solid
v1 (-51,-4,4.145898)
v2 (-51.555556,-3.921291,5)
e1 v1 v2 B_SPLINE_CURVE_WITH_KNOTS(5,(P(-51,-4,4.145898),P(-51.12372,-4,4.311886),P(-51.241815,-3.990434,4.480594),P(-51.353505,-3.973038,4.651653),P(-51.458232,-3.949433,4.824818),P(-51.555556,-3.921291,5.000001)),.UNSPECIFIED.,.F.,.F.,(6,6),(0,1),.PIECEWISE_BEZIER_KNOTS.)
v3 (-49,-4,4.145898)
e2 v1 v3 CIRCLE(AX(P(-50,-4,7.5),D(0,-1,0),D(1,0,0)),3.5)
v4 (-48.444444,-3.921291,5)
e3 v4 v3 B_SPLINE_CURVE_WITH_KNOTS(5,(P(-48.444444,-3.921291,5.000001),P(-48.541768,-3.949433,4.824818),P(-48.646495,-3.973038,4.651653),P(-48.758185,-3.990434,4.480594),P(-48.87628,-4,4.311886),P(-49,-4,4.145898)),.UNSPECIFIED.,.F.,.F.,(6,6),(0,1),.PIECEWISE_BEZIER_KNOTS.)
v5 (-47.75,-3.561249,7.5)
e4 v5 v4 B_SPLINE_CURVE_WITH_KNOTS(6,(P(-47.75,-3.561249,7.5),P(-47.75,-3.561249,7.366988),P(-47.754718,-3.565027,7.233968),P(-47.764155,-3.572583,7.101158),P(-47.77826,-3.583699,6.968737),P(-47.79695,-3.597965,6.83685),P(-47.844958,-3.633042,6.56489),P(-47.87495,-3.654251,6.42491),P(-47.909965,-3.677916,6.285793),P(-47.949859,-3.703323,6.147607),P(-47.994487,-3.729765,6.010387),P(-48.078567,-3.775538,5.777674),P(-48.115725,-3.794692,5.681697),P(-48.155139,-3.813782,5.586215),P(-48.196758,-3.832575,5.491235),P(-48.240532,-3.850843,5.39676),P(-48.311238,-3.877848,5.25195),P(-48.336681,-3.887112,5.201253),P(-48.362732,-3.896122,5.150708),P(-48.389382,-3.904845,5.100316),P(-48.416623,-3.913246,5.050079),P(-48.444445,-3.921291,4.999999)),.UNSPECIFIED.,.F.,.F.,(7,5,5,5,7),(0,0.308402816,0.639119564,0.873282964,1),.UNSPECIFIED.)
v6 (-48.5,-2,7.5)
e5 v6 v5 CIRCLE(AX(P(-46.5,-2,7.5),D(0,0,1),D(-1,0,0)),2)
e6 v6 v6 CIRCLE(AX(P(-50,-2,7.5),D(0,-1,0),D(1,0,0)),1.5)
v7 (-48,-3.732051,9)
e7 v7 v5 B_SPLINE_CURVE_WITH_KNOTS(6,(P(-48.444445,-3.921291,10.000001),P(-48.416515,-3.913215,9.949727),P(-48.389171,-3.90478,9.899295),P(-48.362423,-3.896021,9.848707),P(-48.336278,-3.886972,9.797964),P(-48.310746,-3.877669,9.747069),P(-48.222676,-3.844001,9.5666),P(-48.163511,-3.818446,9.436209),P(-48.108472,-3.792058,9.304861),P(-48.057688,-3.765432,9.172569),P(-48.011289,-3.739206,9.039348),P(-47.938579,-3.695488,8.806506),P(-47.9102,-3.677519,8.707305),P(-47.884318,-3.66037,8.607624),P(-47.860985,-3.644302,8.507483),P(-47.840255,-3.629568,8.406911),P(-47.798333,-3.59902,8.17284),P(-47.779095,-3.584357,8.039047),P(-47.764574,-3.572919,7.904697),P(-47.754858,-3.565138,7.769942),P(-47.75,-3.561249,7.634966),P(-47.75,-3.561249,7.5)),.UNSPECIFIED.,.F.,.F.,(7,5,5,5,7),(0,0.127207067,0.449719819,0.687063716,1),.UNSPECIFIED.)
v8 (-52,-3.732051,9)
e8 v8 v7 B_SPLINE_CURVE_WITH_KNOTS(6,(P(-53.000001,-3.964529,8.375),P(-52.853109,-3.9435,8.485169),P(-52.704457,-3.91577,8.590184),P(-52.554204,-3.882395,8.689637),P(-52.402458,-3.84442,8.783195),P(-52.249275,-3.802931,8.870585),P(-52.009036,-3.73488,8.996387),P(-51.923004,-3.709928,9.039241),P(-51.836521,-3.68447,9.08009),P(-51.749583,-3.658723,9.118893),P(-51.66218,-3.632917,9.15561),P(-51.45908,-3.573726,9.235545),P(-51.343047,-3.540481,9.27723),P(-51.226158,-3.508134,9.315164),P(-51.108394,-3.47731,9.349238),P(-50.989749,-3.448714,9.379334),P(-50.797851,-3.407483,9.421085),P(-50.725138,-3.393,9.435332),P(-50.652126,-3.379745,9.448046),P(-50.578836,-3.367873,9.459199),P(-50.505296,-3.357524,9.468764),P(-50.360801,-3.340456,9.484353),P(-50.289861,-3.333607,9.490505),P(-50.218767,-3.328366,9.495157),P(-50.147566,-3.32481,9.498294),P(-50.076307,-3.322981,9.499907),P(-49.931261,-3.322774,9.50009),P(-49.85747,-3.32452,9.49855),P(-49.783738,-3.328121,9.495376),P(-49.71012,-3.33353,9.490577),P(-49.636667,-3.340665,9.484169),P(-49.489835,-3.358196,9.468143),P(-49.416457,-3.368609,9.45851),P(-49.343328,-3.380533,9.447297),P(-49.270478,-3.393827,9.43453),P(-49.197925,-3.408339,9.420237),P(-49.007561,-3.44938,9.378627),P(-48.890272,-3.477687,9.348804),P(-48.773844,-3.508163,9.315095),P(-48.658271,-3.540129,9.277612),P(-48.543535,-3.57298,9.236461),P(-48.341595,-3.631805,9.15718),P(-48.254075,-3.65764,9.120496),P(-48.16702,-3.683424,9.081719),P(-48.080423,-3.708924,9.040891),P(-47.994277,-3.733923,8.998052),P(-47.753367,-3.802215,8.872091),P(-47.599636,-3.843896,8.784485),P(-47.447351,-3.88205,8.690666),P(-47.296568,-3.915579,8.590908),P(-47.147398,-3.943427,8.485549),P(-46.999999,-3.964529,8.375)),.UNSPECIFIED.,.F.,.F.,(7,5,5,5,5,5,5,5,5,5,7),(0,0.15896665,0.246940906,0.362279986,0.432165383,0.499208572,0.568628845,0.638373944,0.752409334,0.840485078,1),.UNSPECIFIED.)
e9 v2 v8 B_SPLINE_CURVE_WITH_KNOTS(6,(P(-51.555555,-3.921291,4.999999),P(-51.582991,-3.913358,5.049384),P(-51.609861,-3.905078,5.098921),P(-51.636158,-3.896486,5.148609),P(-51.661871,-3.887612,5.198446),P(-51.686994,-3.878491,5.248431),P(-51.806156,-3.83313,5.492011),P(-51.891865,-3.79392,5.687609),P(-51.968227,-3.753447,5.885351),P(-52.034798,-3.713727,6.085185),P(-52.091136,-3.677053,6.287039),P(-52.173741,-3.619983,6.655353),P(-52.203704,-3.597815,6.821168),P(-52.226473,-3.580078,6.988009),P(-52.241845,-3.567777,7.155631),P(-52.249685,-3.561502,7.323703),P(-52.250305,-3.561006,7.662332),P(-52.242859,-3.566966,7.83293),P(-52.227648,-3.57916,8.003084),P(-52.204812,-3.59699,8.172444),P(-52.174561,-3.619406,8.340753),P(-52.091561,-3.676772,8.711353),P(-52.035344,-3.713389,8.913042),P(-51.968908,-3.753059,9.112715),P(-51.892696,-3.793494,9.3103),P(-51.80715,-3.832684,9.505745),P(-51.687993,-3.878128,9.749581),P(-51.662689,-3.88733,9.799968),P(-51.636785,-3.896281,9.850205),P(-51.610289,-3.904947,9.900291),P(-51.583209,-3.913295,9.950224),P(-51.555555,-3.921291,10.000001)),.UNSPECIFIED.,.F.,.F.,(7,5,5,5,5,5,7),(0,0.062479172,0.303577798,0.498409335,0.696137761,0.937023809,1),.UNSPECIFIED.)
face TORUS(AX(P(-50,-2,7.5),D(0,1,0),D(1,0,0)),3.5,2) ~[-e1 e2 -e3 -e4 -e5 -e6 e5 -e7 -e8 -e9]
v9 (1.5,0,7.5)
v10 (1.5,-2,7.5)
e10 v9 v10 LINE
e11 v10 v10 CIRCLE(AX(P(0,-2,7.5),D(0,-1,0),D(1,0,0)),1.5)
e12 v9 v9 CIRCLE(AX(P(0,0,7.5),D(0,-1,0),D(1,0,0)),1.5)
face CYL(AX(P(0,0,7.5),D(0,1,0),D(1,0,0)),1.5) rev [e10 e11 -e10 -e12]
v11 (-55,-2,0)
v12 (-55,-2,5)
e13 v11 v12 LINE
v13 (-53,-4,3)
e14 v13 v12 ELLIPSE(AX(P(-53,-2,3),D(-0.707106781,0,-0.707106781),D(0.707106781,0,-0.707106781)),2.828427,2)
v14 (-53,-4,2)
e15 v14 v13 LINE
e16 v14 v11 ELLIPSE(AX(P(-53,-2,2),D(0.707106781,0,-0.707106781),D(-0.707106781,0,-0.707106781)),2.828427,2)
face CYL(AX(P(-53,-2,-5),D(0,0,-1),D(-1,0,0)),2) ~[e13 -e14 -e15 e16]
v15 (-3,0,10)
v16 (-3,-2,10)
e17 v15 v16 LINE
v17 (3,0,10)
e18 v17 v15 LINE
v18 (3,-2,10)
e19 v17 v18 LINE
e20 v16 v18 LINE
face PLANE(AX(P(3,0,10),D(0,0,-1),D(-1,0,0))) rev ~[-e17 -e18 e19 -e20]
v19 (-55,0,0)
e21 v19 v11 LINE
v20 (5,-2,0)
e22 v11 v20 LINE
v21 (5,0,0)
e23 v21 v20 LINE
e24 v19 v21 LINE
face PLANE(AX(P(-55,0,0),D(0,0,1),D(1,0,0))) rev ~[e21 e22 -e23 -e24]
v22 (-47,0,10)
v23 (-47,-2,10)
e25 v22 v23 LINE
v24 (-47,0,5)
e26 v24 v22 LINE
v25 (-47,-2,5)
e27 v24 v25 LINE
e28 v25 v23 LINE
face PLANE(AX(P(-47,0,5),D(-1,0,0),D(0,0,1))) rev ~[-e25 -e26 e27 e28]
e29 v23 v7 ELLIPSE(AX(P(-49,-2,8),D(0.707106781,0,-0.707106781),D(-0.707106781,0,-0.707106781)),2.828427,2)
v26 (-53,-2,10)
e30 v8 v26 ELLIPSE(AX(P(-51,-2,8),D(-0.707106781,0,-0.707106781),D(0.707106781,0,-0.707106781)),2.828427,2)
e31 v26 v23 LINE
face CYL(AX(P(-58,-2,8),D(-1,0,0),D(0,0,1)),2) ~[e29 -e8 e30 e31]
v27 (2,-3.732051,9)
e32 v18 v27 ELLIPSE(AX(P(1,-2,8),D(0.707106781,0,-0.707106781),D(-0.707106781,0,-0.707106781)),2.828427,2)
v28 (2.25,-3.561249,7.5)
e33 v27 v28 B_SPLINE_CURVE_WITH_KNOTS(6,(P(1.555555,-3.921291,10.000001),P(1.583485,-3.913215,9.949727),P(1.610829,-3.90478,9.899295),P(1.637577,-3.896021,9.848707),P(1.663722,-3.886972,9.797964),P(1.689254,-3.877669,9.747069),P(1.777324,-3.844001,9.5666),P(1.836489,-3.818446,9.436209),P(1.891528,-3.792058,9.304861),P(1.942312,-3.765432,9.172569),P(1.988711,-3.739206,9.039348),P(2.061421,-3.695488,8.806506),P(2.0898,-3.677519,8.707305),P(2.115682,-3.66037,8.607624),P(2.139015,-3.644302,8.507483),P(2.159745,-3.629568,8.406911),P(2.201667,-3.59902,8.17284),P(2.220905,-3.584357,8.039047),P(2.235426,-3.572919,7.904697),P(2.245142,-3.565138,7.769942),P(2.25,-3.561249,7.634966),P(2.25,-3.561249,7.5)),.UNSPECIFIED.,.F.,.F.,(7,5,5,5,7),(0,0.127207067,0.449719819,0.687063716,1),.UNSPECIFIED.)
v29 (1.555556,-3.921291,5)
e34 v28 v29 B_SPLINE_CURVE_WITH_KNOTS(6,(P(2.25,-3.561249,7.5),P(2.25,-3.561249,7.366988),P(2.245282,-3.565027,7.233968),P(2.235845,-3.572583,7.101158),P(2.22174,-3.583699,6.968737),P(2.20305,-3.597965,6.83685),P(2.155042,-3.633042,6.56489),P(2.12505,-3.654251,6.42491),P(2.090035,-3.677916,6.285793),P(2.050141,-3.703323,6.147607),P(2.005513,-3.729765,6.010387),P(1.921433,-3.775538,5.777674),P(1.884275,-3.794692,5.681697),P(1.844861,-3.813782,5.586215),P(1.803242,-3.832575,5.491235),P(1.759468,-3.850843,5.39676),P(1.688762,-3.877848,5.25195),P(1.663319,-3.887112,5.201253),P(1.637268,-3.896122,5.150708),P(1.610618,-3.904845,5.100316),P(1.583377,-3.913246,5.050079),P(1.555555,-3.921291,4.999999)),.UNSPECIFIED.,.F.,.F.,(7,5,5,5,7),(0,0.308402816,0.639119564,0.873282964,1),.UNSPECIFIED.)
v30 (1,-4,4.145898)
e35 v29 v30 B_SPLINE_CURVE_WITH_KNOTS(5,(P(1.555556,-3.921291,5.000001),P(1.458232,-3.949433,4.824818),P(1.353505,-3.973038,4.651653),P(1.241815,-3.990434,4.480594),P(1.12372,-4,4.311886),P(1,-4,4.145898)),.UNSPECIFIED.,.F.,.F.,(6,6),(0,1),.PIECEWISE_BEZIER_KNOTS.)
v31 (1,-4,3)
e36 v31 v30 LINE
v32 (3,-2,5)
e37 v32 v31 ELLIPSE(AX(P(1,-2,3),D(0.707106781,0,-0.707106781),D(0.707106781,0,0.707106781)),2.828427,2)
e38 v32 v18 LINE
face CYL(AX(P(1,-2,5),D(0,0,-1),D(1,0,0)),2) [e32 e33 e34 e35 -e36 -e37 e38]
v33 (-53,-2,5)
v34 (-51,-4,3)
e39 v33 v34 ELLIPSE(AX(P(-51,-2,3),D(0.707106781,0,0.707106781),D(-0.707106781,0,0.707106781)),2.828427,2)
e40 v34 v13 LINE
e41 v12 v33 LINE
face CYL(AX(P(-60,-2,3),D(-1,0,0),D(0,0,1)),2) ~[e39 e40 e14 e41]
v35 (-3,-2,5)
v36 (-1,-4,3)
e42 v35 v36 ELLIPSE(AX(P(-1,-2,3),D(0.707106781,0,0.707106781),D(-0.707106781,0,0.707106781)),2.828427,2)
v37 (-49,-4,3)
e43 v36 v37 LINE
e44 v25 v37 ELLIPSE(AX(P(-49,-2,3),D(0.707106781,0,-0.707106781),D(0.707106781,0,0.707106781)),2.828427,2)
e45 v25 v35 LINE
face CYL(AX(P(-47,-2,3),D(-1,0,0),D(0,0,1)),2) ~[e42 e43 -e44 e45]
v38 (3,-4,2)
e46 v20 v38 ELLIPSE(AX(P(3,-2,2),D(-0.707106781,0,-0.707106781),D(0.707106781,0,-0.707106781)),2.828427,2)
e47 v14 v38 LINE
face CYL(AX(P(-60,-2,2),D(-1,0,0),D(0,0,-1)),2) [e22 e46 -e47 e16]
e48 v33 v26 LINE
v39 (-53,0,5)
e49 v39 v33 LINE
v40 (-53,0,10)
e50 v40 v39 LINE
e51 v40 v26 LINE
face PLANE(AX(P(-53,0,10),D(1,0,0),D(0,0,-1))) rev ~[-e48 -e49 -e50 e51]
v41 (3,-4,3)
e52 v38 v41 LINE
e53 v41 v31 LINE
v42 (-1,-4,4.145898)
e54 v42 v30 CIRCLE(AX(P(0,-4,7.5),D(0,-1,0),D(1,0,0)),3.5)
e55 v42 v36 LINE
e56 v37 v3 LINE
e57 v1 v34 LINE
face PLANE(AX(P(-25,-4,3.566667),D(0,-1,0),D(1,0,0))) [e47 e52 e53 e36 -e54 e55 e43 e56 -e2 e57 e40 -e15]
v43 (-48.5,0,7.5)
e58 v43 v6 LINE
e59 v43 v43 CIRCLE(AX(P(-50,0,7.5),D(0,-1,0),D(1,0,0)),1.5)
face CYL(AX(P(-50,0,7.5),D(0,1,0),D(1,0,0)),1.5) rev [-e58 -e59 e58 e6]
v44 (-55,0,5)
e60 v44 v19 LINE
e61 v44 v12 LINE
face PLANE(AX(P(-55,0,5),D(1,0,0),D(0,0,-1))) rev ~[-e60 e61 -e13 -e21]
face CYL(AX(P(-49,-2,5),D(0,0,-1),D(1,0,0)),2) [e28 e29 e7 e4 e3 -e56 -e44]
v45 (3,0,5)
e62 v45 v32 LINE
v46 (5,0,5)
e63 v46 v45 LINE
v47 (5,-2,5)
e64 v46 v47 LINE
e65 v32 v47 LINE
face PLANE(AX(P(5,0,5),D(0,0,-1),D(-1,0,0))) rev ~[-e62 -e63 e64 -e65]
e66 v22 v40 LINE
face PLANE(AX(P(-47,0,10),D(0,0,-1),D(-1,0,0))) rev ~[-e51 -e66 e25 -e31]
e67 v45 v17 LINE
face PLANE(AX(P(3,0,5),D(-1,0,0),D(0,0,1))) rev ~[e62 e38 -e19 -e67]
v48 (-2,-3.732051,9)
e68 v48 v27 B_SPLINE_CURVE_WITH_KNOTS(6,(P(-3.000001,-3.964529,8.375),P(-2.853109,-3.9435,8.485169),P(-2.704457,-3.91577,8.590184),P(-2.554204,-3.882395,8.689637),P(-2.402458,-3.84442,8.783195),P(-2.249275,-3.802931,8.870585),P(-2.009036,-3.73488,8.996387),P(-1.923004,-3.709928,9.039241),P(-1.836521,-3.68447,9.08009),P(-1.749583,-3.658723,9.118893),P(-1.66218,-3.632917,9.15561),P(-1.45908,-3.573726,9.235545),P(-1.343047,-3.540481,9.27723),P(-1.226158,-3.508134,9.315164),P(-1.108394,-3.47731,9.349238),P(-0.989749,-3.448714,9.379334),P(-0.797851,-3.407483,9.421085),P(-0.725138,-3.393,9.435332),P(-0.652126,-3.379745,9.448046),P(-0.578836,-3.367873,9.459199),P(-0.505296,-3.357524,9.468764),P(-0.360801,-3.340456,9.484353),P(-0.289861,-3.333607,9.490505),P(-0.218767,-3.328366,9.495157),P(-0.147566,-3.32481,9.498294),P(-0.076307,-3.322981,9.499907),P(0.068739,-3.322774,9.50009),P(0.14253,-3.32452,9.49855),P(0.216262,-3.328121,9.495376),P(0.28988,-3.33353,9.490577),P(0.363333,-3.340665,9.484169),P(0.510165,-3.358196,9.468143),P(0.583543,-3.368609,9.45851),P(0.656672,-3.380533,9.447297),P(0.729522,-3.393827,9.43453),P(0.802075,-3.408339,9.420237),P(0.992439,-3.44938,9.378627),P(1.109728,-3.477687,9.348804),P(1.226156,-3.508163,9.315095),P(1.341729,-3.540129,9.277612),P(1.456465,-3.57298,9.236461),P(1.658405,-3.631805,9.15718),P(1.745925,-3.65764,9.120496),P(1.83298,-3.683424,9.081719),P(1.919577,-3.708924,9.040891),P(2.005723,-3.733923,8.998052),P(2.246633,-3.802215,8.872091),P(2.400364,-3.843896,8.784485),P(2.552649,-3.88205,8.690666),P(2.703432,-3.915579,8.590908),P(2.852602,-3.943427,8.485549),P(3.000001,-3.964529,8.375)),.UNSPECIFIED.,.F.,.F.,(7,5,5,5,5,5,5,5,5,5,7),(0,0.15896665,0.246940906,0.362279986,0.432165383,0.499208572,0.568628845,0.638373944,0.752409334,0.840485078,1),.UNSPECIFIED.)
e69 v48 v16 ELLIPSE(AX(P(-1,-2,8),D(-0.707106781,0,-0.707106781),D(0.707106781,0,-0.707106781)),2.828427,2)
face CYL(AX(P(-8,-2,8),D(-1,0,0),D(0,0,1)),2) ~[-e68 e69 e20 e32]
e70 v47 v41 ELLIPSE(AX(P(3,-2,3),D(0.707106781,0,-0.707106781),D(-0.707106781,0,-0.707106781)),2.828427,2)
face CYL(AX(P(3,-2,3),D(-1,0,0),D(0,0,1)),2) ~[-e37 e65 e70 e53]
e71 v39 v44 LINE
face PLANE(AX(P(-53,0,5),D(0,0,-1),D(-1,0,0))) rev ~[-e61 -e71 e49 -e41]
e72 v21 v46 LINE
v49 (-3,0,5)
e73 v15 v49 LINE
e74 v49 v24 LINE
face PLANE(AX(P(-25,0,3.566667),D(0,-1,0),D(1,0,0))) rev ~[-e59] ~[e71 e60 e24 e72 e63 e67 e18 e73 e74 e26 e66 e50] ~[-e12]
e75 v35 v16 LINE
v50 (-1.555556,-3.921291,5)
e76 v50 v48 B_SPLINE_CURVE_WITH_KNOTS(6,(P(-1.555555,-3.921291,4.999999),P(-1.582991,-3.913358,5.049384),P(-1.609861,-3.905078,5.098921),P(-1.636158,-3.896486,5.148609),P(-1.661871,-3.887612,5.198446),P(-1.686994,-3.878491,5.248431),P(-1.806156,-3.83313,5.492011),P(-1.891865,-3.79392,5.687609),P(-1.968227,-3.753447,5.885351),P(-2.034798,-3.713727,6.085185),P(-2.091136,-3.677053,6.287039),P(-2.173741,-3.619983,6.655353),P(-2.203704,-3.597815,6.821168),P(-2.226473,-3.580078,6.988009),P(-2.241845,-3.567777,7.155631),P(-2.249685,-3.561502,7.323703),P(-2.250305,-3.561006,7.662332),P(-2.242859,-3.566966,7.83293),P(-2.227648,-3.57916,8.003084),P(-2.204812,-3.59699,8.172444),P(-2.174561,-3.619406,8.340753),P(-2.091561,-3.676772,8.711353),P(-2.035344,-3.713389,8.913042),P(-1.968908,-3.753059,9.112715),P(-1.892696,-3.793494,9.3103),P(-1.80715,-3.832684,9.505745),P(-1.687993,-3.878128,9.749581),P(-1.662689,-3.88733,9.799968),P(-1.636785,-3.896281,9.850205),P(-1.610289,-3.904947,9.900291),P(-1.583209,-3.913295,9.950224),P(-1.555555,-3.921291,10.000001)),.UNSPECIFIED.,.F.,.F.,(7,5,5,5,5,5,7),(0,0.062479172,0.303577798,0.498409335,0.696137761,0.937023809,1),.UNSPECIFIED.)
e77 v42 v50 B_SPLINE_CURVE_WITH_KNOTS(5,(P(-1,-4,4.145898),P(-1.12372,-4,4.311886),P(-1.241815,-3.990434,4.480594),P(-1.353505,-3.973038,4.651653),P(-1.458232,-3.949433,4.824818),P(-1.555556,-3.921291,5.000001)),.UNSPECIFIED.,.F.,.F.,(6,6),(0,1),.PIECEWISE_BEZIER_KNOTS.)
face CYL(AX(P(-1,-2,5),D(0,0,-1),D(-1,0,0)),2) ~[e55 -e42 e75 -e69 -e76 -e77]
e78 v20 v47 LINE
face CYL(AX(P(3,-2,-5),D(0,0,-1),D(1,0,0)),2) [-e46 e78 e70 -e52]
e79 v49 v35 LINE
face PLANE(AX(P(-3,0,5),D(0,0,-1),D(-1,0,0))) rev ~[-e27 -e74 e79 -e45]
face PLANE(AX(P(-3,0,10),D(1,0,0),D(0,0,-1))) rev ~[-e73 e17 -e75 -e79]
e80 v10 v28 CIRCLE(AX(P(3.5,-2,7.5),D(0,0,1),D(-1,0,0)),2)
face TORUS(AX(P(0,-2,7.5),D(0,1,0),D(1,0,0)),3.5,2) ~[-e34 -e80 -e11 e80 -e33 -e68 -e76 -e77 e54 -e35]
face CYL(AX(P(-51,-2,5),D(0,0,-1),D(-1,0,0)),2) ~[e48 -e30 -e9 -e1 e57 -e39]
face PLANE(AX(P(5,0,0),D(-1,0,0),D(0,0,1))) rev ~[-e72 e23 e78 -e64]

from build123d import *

# Parameters (mm, degrees)
F0_R         = 1.5
F1_DEPTH     = 4
F2_T1_DEPTH  = 15
F2_T3_DEPTH  = 70
F2_T5_DEPTH  = 7
F2_T7_DEPTH  = 10
F2_T9_DEPTH  = 16
F2_T11_DEPTH = 44
F2_T13_DEPTH = 16
F2_T15_DEPTH = 7
F2_T25_DEPTH = 12
F2_T29_DEPTH = 15
F2_T36_DEPTH = 15
F2_T40_DEPTH = 49
F2_T47_DEPTH = 49
F2_T51_DEPTH = 15
F2_T58_DEPTH = 15
F2_T62_DEPTH = 12


# Not quite as in the source:
# - a fillet or chamfer that OpenCascade refuses, or shapes differently, is made with other operations: its cross-section is extruded or revolved along the edge and cut away or added


with BuildPart() as f1:
    # F0 (on Front) → F1 (new body)
    with BuildSketch(Plane.XZ):
        Polygon((-55, 5), (-55, 0), (5, 0), (5, 5), (3, 5), (3, 10), (-3, 10), (-3, 5), (-47, 5), (-47, 10), (-53, 10), (-53, 5), align=None)
        with Locations((-50, 7.5)):
            Circle(F0_R, mode=Mode.SUBTRACT)
        with Locations((0, 7.5)):
            Circle(F0_R, mode=Mode.SUBTRACT)
    extrude(amount=F1_DEPTH)

    # F2: fillet of radius 2 on 14 edges, made by hand

    # F2_s2 → F2_t1 (cut)
    with BuildSketch(Plane.XY.offset(-5)):
        with BuildLine():
            ThreePointArc((-55, -2), (-54.4142135624, -3.4142135624), (-53, -4))
            Line((-53, -4), (-55, -4))
            Line((-55, -4), (-55, -2))
        make_face()
        with BuildLine():
            ThreePointArc((5, -2), (4.4142135624, -3.4142135624), (3, -4))
            Line((3, -4), (5, -4))
            Line((5, -4), (5, -2))
        make_face()
    extrude(amount=F2_T1_DEPTH, mode=Mode.SUBTRACT)

    # F2_s4 → F2_t3 (cut)
    with BuildSketch(Plane.YZ.offset(-60)):
        with BuildLine():
            ThreePointArc((-2, 0), (-3.4142135624, 0.5857864376), (-4, 2))
            Line((-4, 2), (-4, 0))
            Line((-4, 0), (-2, 0))
        make_face()
    extrude(amount=F2_T3_DEPTH, mode=Mode.SUBTRACT)

    # F2_s6 → F2_t5 (cut)
    with BuildSketch(Plane.YZ.offset(3)):
        with BuildLine():
            ThreePointArc((-2, 5), (-3.4142135624, 4.4142135624), (-4, 3))
            Line((-4, 3), (-4, 5))
            Line((-4, 5), (-2, 5))
        make_face()
    extrude(amount=F2_T5_DEPTH, mode=Mode.SUBTRACT)

    # F2_s8 → F2_t7 (cut)
    with BuildSketch(Plane.XY.offset(5)):
        with BuildLine():
            ThreePointArc((3, -2), (2.4142135624, -3.4142135624), (1, -4))
            Line((1, -4), (3, -4))
            Line((3, -4), (3, -2))
        make_face()
        with BuildLine():
            ThreePointArc((-3, -2), (-2.4142135624, -3.4142135624), (-1, -4))
            Line((-1, -4), (-3, -4))
            Line((-3, -4), (-3, -2))
        make_face()
        with BuildLine():
            ThreePointArc((-47, -2), (-47.5857864376, -3.4142135624), (-49, -4))
            Line((-49, -4), (-47, -4))
            Line((-47, -4), (-47, -2))
        make_face()
        with BuildLine():
            ThreePointArc((-53, -2), (-52.4142135624, -3.4142135624), (-51, -4))
            Line((-51, -4), (-53, -4))
            Line((-53, -4), (-53, -2))
        make_face()
    extrude(amount=F2_T7_DEPTH, mode=Mode.SUBTRACT)

    # F2_s10 → F2_t9 (cut)
    with BuildSketch(Plane.YZ.offset(-8)):
        with BuildLine():
            ThreePointArc((-2, 10), (-3.4142135624, 9.4142135624), (-4, 8))
            Line((-4, 8), (-4, 10))
            Line((-4, 10), (-2, 10))
        make_face()
    extrude(amount=F2_T9_DEPTH, mode=Mode.SUBTRACT)

    # F2_s12 → F2_t11 (cut)
    with BuildSketch(Plane.YZ.offset(-47)):
        with BuildLine():
            ThreePointArc((-2, 5), (-3.4142135624, 4.4142135624), (-4, 3))
            Line((-4, 3), (-4, 5))
            Line((-4, 5), (-2, 5))
        make_face()
    extrude(amount=F2_T11_DEPTH, mode=Mode.SUBTRACT)

    # F2_s14 → F2_t13 (cut)
    with BuildSketch(Plane.YZ.offset(-58)):
        with BuildLine():
            ThreePointArc((-2, 10), (-3.4142135624, 9.4142135624), (-4, 8))
            Line((-4, 8), (-4, 10))
            Line((-4, 10), (-2, 10))
        make_face()
    extrude(amount=F2_T13_DEPTH, mode=Mode.SUBTRACT)

    # F2_s16 → F2_t15 (cut)
    with BuildSketch(Plane.YZ.offset(-60)):
        with BuildLine():
            ThreePointArc((-2, 5), (-3.4142135624, 4.4142135624), (-4, 3))
            Line((-4, 3), (-4, 5))
            Line((-4, 5), (-2, 5))
        make_face()
    extrude(amount=F2_T15_DEPTH, mode=Mode.SUBTRACT)

    # F2_s17 → F2_t18 (revolve, cut)
    with BuildSketch(Plane.XY.offset(7.5)):
        with BuildLine():
            ThreePointArc((-48.5, -2), (-47.9142135624, -3.4142135624), (-46.5, -4))
            Line((-46.5, -4), (-48.5, -4))
            Line((-48.5, -4), (-48.5, -2))
        make_face()
    revolve(axis=Axis((-50, -4, 7.5), (0, -1, 0)), mode=Mode.SUBTRACT)

    # F2_s19 → F2_t20 (revolve, cut)
    with BuildSketch(Plane.XY.offset(7.5)):
        with BuildLine():
            ThreePointArc((1.5, -2), (2.0857864376, -3.4142135624), (3.5, -4))
            Line((3.5, -4), (1.5, -4))
            Line((1.5, -4), (1.5, -2))
        make_face()
    revolve(axis=Axis((0, -4, 7.5), (0, -1, 0)), mode=Mode.SUBTRACT)


with BuildPart() as f2_tool23:
    # F2_s24 → F2_t25 (new body)
    with BuildSketch(Plane.YZ.offset(10)):
        with BuildLine():
            ThreePointArc((-2, 5), (-3.4142135624, 4.4142135624), (-4, 3))
            Line((-4, 3), (-4, 5))
            Line((-4, 5), (-2, 5))
        make_face()
    extrude(amount=-F2_T25_DEPTH)

    split(bisect_by=Plane.YZ.offset(3), keep=Keep.BOTTOM)


with BuildPart() as f2_tool27:
    # F2_s28 → F2_t29 (new body)
    with BuildSketch(Plane.XY):
        with BuildLine():
            ThreePointArc((3, -2), (2.4142135624, -3.4142135624), (1, -4))
            Line((1, -4), (3, -4))
            Line((3, -4), (3, -2))
        make_face()
    extrude(amount=F2_T29_DEPTH)

    split(bisect_by=Plane.XY.offset(5), keep=Keep.BOTTOM)


with BuildPart() as f2_tool23_1:
    add(f2_tool23.part)

    # F2_t31: intersect F2_tool27
    add(f2_tool27.part, mode=Mode.INTERSECT)


with BuildPart() as f1_1:
    add(f1.part)

    # F2_t21: cut F2_tool23
    add(f2_tool23_1.part, mode=Mode.SUBTRACT)


with BuildPart() as f2_tool34:
    # F2_s35 → F2_t36 (new body)
    with BuildSketch(Plane.XY.offset(15)):
        with BuildLine():
            ThreePointArc((-3, -2), (-2.4142135624, -3.4142135624), (-1, -4))
            Line((-1, -4), (-3, -4))
            Line((-3, -4), (-3, -2))
        make_face()
    extrude(amount=-F2_T36_DEPTH)

    split(bisect_by=Plane.XY.offset(5), keep=Keep.BOTTOM)


with BuildPart() as f2_tool38:
    # F2_s39 → F2_t40 (new body)
    with BuildSketch(Plane.YZ.offset(2)):
        with BuildLine():
            ThreePointArc((-2, 5), (-3.4142135624, 4.4142135624), (-4, 3))
            Line((-4, 3), (-4, 5))
            Line((-4, 5), (-2, 5))
        make_face()
    extrude(amount=-F2_T40_DEPTH)

    split(bisect_by=Plane.YZ.offset(-3), keep=Keep.TOP)


with BuildPart() as f2_tool34_1:
    add(f2_tool34.part)

    # F2_t42: intersect F2_tool38
    add(f2_tool38.part, mode=Mode.INTERSECT)


with BuildPart() as f1_2:
    add(f1_1.part)

    # F2_t32: cut F2_tool34
    add(f2_tool34_1.part, mode=Mode.SUBTRACT)


with BuildPart() as f2_tool45:
    # F2_s46 → F2_t47 (new body)
    with BuildSketch(Plane.YZ.offset(-3)):
        with BuildLine():
            ThreePointArc((-2, 5), (-3.4142135624, 4.4142135624), (-4, 3))
            Line((-4, 3), (-4, 5))
            Line((-4, 5), (-2, 5))
        make_face()
    extrude(amount=-F2_T47_DEPTH)

    split(bisect_by=Plane.YZ.offset(-47), keep=Keep.BOTTOM)


with BuildPart() as f2_tool49:
    # F2_s50 → F2_t51 (new body)
    with BuildSketch(Plane.XY):
        with BuildLine():
            ThreePointArc((-47, -2), (-47.5857864376, -3.4142135624), (-49, -4))
            Line((-49, -4), (-47, -4))
            Line((-47, -4), (-47, -2))
        make_face()
    extrude(amount=F2_T51_DEPTH)

    split(bisect_by=Plane.XY.offset(5), keep=Keep.BOTTOM)


with BuildPart() as f2_tool45_1:
    add(f2_tool45.part)

    # F2_t53: intersect F2_tool49
    add(f2_tool49.part, mode=Mode.INTERSECT)


with BuildPart() as f1_3:
    add(f1_2.part)

    # F2_t43: cut F2_tool45
    add(f2_tool45_1.part, mode=Mode.SUBTRACT)


with BuildPart() as f2_tool56:
    # F2_s57 → F2_t58 (new body)
    with BuildSketch(Plane.XY.offset(15)):
        with BuildLine():
            ThreePointArc((-53, -2), (-52.4142135624, -3.4142135624), (-51, -4))
            Line((-51, -4), (-53, -4))
            Line((-53, -4), (-53, -2))
        make_face()
    extrude(amount=-F2_T58_DEPTH)

    split(bisect_by=Plane.XY.offset(5), keep=Keep.BOTTOM)


with BuildPart() as f2_tool60:
    # F2_s61 → F2_t62 (new body)
    with BuildSketch(Plane.YZ.offset(-48)):
        with BuildLine():
            ThreePointArc((-2, 5), (-3.4142135624, 4.4142135624), (-4, 3))
            Line((-4, 3), (-4, 5))
            Line((-4, 5), (-2, 5))
        make_face()
    extrude(amount=-F2_T62_DEPTH)

    split(bisect_by=Plane.YZ.offset(-53), keep=Keep.TOP)


with BuildPart() as f2_tool56_1:
    add(f2_tool56.part)

    # F2_t64: intersect F2_tool60
    add(f2_tool60.part, mode=Mode.INTERSECT)


with BuildPart() as f1_4:
    add(f1_3.part)

    # F2_t54: cut F2_tool56
    add(f2_tool56_1.part, mode=Mode.SUBTRACT)


solid = f1_4.part
